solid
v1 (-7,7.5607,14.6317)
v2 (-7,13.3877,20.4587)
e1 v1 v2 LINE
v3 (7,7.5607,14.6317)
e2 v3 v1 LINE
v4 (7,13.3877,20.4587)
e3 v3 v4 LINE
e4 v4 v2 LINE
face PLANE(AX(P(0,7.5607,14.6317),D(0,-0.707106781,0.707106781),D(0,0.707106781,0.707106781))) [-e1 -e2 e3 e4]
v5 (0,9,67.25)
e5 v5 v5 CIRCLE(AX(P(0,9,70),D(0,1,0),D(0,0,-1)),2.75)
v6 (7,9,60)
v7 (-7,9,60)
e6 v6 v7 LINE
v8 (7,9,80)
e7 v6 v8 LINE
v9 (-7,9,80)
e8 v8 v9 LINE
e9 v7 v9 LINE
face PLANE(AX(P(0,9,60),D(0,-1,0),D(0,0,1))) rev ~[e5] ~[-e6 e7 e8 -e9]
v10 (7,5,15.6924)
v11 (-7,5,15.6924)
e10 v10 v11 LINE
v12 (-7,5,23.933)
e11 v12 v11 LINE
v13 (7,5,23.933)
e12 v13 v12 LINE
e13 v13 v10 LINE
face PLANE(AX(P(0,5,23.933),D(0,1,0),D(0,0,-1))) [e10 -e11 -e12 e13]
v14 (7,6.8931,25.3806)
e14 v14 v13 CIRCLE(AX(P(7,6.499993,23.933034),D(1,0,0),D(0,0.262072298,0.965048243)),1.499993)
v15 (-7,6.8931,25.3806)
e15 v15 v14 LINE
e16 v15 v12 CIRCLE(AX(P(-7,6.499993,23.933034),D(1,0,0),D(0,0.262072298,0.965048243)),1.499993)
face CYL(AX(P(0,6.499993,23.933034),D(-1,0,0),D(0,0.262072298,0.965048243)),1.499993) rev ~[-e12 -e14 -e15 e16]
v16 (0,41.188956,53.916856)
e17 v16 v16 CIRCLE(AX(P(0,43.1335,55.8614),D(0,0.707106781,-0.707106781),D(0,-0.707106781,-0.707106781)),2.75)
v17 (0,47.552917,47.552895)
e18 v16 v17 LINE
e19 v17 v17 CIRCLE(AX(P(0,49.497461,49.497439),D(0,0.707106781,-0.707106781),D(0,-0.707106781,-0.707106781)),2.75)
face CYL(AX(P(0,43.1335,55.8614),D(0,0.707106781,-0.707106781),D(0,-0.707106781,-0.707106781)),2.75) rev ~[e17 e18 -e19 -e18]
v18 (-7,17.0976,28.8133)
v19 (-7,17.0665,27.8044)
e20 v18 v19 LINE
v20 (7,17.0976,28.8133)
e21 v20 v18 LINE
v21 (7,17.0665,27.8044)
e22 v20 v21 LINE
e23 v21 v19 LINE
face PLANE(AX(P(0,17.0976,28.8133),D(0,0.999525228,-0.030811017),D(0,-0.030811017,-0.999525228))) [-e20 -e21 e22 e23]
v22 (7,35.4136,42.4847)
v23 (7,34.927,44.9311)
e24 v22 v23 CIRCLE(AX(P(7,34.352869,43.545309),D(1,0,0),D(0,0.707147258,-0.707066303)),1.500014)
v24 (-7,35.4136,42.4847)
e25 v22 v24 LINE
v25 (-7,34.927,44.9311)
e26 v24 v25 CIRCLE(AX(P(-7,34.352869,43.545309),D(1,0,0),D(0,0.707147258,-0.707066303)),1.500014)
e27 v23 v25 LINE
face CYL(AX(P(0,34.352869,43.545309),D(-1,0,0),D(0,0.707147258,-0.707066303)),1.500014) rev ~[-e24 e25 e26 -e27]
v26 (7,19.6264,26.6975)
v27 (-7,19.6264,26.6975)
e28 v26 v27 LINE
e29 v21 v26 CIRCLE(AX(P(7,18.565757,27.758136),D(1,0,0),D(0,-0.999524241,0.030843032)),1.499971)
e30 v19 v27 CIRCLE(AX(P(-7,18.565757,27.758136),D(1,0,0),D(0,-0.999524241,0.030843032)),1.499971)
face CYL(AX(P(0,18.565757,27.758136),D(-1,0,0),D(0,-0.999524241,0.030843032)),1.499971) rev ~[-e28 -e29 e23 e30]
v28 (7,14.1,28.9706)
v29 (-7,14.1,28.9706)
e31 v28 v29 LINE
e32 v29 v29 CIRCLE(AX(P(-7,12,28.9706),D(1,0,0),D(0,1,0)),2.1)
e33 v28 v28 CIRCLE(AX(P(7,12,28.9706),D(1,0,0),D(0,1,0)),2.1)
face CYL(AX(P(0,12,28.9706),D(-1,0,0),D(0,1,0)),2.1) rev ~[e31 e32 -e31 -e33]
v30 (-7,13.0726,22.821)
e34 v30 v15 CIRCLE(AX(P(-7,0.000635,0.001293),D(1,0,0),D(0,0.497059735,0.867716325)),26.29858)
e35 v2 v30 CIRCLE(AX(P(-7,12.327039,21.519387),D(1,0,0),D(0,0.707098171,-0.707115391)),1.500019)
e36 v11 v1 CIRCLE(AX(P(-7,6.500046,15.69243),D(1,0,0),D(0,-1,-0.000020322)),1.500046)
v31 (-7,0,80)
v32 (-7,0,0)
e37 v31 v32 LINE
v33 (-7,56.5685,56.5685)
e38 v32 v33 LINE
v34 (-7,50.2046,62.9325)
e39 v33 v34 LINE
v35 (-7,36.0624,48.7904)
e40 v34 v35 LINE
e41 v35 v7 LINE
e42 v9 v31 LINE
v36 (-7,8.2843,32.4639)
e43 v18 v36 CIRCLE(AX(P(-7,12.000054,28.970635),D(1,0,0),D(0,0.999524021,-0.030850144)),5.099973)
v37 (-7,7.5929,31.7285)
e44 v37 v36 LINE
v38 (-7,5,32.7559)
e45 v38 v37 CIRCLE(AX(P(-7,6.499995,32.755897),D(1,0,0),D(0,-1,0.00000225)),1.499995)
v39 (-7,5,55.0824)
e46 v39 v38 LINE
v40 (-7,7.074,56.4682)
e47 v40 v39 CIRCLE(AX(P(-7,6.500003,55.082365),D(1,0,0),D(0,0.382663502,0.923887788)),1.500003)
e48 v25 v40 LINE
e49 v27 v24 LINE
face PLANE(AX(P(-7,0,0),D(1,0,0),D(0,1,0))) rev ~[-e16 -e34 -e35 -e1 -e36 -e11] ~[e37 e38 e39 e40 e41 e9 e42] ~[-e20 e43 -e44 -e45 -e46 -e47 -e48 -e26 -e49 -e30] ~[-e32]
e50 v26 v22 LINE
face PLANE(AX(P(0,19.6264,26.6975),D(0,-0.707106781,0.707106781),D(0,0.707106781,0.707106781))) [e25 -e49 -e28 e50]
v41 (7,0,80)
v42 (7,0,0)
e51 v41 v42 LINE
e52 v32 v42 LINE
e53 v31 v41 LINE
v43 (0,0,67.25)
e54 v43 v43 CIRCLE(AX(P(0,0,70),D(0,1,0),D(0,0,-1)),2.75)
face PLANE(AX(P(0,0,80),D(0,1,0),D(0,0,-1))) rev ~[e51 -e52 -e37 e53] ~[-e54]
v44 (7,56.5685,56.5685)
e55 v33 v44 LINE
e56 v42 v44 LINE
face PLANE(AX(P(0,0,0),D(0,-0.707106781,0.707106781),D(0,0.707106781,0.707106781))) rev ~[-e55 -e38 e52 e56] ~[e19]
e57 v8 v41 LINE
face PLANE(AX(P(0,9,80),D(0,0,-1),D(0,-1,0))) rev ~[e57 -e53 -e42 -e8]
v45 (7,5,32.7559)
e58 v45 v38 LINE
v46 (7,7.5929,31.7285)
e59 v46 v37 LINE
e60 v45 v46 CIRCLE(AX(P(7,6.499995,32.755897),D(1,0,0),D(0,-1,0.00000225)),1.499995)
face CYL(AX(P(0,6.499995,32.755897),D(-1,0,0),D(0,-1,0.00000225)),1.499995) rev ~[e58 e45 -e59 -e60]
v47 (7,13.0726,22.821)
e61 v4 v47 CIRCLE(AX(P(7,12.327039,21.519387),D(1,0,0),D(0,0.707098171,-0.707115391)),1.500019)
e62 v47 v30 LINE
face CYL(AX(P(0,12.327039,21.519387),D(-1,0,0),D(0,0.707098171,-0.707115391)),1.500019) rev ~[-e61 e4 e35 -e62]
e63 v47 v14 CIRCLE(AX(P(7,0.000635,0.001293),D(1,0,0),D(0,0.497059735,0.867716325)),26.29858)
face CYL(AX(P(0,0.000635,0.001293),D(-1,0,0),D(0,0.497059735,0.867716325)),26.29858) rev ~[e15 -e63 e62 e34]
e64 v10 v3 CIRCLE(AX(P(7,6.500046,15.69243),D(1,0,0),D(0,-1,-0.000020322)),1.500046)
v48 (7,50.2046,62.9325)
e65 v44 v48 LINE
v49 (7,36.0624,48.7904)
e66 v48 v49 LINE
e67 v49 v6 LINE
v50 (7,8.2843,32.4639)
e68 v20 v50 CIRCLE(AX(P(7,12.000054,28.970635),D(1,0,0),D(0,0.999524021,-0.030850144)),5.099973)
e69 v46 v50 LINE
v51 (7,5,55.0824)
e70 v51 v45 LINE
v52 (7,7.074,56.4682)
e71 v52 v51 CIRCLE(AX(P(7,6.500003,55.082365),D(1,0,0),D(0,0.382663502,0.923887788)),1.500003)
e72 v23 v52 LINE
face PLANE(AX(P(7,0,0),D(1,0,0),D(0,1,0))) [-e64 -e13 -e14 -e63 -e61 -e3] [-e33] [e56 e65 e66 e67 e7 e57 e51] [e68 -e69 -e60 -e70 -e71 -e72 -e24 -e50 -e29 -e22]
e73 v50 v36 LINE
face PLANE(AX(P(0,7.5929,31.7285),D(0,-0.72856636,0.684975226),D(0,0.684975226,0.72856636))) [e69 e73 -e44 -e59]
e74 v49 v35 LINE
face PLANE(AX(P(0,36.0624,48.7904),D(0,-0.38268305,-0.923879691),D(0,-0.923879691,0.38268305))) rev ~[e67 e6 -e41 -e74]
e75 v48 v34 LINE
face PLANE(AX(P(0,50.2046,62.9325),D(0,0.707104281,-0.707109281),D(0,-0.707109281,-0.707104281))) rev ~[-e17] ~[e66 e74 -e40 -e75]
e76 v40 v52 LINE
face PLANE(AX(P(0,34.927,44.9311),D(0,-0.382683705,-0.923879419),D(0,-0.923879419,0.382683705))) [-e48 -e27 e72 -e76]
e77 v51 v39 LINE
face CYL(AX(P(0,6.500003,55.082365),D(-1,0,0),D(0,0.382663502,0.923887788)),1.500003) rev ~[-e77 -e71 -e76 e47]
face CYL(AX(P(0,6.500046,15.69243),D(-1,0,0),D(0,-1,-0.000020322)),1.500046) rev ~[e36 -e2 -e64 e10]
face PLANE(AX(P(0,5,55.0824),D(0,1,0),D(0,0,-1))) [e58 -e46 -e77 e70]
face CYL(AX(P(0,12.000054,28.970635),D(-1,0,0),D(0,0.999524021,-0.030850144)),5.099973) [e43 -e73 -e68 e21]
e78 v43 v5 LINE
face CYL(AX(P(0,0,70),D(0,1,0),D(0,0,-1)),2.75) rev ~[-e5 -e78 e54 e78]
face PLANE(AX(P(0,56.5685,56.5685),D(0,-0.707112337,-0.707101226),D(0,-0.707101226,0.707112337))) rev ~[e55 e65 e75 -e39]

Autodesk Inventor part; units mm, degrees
sketch "Sketch_1" plane through (0, 0, 0) normal (1, 0, 0) x (0, 1, 0)
  line L0 (0, 80) -> (0, 0)
  line L1 (0, 0) -> (56.5685, 56.5685)
  line L2 (56.5685, 56.5685) -> (50.2046, 62.9325)
  line L3 (50.2046, 62.9325) -> (36.0624, 48.7904)
  line L4 (36.0624, 48.7904) -> (9, 60)
  line L5 (9, 60) -> (9, 80)
  line L6 (9, 80) -> (0, 80)
  arc A0 (6.8931, 25.3806) -> (5, 23.933) centre (6.5, 23.933) ccw
  line L7 (5, 23.933) -> (5, 15.6924)
  arc A1 (5, 15.6924) -> (7.5607, 14.6317) centre (6.5, 15.6924) ccw
  line L8 (7.5607, 14.6317) -> (13.3877, 20.4587)
  arc A2 (13.3877, 20.4587) -> (13.0726, 22.821) centre (12.327, 21.5194) ccw
  arc A3 (13.0726, 22.821) -> (6.8931, 25.3806) centre (0, 0) ccw
  circle A4 centre (12, 28.9706) radius 2.1
  arc A5 (7.074, 56.4682) -> (5, 55.0824) centre (6.5, 55.0824) ccw
  line L9 (5, 55.0824) -> (5, 32.7559)
  arc A6 (5, 32.7559) -> (7.5929, 31.7285) centre (6.5, 32.7559) ccw
  line L10 (7.5929, 31.7285) -> (8.2843, 32.4639)
  arc A7 (17.0976, 28.8133) -> (8.2843, 32.4639) centre (12, 28.9706) ccw
  line L11 (17.0976, 28.8133) -> (17.0665, 27.8044)
  arc A8 (17.0665, 27.8044) -> (19.6264, 26.6975) centre (18.5657, 27.7581) ccw
  line L12 (19.6264, 26.6975) -> (35.4136, 42.4847)
  arc A9 (35.4136, 42.4847) -> (34.927, 44.9311) centre (34.3529, 43.5453) ccw
  line L13 (34.927, 44.9311) -> (7.074, 56.4682)
extrude "Extrusion1" add sketch "Sketch_1" along normal mid plane 14
sketch "Sketch2" plane through (-7, 50.2046, 62.9325) normal (0, -0.7071068, 0.7071068) x (1, 0, 0)
  point P0 (7, -10)
hole "Hole1" at (0, 43.1335, 55.8614) direction (0, 0.7071068, -0.7071068) diameter 5.5 depth 9
sketch "Sketch3" plane through (-7, 0, 80) normal (0, -1, 0) x (1, 0, 0)
  point P0 (7, -10)
hole "Hole2" at (0, 0, 70) direction (0, 1, 0) diameter 5.5 depth 9
ref_plane "bracket_to_dummy_XY" through (0, 0, 0) normal (0, 1, 0) x (1, 0, 0)
ref_plane "bracket_to_dummy_YZ" through (0, 0, 0) normal (1, 0, 0) x (0, 0, -1)
ref_plane "bracket_to_dummy_ZX" through (0, 0, 0) normal (0, 0, -1) x (0, 1, 0)
ref_plane "to_bolts_b_1_XY" through (0, 43.1335, 55.8614) normal (0, -0.7071068, 0.7071068) x (1, 0, 0)
ref_plane "to_bolts_b_1_YZ" through (0, 43.1335, 55.8614) normal (1, 0, 0) x (0, 0.7071068, 0.7071068)
ref_plane "to_bolts_b_1_ZX" through (0, 43.1335, 55.8614) normal (0, 0.7071068, 0.7071068) x (0, -0.7071068, 0.7071068)
ref_plane "to_bolts_base_b_1_XY" through (0, 9, 70) normal (0, 1, 0) x (1, 0, 0)
ref_plane "to_bolts_base_b_1_YZ" through (0, 9, 70) normal (1, 0, 0) x (0, 0, -1)
ref_plane "to_bolts_base_b_1_ZX" through (0, 9, 70) normal (0, 0, -1) x (0, 1, 0)
ref_plane "to_nuts_b_1_XY" through (0, 50.9117, 48.0833) normal (0, -0.7071068, 0.7071068) x (1, 0, 0)
ref_plane "to_nuts_b_1_YZ" through (0, 50.9117, 48.0833) normal (1, 0, 0) x (0, 0.7071068, 0.7071068)
ref_plane "to_nuts_b_1_ZX" through (0, 50.9117, 48.0833) normal (0, 0.7071068, 0.7071068) x (0, -0.7071068, 0.7071068)
ref_plane "to_nuts_base_b_1_XY" through (0, -2, 70) normal (0, 1, 0) x (1, 0, 0)
ref_plane "to_nuts_base_b_1_YZ" through (0, -2, 70) normal (1, 0, 0) x (0, 0, -1)
ref_plane "to_nuts_base_b_1_ZX" through (0, -2, 70) normal (0, 0, -1) x (0, 1, 0)
properties part number "HBL45TS5hbl45ts5" material "Stainless Steel"
